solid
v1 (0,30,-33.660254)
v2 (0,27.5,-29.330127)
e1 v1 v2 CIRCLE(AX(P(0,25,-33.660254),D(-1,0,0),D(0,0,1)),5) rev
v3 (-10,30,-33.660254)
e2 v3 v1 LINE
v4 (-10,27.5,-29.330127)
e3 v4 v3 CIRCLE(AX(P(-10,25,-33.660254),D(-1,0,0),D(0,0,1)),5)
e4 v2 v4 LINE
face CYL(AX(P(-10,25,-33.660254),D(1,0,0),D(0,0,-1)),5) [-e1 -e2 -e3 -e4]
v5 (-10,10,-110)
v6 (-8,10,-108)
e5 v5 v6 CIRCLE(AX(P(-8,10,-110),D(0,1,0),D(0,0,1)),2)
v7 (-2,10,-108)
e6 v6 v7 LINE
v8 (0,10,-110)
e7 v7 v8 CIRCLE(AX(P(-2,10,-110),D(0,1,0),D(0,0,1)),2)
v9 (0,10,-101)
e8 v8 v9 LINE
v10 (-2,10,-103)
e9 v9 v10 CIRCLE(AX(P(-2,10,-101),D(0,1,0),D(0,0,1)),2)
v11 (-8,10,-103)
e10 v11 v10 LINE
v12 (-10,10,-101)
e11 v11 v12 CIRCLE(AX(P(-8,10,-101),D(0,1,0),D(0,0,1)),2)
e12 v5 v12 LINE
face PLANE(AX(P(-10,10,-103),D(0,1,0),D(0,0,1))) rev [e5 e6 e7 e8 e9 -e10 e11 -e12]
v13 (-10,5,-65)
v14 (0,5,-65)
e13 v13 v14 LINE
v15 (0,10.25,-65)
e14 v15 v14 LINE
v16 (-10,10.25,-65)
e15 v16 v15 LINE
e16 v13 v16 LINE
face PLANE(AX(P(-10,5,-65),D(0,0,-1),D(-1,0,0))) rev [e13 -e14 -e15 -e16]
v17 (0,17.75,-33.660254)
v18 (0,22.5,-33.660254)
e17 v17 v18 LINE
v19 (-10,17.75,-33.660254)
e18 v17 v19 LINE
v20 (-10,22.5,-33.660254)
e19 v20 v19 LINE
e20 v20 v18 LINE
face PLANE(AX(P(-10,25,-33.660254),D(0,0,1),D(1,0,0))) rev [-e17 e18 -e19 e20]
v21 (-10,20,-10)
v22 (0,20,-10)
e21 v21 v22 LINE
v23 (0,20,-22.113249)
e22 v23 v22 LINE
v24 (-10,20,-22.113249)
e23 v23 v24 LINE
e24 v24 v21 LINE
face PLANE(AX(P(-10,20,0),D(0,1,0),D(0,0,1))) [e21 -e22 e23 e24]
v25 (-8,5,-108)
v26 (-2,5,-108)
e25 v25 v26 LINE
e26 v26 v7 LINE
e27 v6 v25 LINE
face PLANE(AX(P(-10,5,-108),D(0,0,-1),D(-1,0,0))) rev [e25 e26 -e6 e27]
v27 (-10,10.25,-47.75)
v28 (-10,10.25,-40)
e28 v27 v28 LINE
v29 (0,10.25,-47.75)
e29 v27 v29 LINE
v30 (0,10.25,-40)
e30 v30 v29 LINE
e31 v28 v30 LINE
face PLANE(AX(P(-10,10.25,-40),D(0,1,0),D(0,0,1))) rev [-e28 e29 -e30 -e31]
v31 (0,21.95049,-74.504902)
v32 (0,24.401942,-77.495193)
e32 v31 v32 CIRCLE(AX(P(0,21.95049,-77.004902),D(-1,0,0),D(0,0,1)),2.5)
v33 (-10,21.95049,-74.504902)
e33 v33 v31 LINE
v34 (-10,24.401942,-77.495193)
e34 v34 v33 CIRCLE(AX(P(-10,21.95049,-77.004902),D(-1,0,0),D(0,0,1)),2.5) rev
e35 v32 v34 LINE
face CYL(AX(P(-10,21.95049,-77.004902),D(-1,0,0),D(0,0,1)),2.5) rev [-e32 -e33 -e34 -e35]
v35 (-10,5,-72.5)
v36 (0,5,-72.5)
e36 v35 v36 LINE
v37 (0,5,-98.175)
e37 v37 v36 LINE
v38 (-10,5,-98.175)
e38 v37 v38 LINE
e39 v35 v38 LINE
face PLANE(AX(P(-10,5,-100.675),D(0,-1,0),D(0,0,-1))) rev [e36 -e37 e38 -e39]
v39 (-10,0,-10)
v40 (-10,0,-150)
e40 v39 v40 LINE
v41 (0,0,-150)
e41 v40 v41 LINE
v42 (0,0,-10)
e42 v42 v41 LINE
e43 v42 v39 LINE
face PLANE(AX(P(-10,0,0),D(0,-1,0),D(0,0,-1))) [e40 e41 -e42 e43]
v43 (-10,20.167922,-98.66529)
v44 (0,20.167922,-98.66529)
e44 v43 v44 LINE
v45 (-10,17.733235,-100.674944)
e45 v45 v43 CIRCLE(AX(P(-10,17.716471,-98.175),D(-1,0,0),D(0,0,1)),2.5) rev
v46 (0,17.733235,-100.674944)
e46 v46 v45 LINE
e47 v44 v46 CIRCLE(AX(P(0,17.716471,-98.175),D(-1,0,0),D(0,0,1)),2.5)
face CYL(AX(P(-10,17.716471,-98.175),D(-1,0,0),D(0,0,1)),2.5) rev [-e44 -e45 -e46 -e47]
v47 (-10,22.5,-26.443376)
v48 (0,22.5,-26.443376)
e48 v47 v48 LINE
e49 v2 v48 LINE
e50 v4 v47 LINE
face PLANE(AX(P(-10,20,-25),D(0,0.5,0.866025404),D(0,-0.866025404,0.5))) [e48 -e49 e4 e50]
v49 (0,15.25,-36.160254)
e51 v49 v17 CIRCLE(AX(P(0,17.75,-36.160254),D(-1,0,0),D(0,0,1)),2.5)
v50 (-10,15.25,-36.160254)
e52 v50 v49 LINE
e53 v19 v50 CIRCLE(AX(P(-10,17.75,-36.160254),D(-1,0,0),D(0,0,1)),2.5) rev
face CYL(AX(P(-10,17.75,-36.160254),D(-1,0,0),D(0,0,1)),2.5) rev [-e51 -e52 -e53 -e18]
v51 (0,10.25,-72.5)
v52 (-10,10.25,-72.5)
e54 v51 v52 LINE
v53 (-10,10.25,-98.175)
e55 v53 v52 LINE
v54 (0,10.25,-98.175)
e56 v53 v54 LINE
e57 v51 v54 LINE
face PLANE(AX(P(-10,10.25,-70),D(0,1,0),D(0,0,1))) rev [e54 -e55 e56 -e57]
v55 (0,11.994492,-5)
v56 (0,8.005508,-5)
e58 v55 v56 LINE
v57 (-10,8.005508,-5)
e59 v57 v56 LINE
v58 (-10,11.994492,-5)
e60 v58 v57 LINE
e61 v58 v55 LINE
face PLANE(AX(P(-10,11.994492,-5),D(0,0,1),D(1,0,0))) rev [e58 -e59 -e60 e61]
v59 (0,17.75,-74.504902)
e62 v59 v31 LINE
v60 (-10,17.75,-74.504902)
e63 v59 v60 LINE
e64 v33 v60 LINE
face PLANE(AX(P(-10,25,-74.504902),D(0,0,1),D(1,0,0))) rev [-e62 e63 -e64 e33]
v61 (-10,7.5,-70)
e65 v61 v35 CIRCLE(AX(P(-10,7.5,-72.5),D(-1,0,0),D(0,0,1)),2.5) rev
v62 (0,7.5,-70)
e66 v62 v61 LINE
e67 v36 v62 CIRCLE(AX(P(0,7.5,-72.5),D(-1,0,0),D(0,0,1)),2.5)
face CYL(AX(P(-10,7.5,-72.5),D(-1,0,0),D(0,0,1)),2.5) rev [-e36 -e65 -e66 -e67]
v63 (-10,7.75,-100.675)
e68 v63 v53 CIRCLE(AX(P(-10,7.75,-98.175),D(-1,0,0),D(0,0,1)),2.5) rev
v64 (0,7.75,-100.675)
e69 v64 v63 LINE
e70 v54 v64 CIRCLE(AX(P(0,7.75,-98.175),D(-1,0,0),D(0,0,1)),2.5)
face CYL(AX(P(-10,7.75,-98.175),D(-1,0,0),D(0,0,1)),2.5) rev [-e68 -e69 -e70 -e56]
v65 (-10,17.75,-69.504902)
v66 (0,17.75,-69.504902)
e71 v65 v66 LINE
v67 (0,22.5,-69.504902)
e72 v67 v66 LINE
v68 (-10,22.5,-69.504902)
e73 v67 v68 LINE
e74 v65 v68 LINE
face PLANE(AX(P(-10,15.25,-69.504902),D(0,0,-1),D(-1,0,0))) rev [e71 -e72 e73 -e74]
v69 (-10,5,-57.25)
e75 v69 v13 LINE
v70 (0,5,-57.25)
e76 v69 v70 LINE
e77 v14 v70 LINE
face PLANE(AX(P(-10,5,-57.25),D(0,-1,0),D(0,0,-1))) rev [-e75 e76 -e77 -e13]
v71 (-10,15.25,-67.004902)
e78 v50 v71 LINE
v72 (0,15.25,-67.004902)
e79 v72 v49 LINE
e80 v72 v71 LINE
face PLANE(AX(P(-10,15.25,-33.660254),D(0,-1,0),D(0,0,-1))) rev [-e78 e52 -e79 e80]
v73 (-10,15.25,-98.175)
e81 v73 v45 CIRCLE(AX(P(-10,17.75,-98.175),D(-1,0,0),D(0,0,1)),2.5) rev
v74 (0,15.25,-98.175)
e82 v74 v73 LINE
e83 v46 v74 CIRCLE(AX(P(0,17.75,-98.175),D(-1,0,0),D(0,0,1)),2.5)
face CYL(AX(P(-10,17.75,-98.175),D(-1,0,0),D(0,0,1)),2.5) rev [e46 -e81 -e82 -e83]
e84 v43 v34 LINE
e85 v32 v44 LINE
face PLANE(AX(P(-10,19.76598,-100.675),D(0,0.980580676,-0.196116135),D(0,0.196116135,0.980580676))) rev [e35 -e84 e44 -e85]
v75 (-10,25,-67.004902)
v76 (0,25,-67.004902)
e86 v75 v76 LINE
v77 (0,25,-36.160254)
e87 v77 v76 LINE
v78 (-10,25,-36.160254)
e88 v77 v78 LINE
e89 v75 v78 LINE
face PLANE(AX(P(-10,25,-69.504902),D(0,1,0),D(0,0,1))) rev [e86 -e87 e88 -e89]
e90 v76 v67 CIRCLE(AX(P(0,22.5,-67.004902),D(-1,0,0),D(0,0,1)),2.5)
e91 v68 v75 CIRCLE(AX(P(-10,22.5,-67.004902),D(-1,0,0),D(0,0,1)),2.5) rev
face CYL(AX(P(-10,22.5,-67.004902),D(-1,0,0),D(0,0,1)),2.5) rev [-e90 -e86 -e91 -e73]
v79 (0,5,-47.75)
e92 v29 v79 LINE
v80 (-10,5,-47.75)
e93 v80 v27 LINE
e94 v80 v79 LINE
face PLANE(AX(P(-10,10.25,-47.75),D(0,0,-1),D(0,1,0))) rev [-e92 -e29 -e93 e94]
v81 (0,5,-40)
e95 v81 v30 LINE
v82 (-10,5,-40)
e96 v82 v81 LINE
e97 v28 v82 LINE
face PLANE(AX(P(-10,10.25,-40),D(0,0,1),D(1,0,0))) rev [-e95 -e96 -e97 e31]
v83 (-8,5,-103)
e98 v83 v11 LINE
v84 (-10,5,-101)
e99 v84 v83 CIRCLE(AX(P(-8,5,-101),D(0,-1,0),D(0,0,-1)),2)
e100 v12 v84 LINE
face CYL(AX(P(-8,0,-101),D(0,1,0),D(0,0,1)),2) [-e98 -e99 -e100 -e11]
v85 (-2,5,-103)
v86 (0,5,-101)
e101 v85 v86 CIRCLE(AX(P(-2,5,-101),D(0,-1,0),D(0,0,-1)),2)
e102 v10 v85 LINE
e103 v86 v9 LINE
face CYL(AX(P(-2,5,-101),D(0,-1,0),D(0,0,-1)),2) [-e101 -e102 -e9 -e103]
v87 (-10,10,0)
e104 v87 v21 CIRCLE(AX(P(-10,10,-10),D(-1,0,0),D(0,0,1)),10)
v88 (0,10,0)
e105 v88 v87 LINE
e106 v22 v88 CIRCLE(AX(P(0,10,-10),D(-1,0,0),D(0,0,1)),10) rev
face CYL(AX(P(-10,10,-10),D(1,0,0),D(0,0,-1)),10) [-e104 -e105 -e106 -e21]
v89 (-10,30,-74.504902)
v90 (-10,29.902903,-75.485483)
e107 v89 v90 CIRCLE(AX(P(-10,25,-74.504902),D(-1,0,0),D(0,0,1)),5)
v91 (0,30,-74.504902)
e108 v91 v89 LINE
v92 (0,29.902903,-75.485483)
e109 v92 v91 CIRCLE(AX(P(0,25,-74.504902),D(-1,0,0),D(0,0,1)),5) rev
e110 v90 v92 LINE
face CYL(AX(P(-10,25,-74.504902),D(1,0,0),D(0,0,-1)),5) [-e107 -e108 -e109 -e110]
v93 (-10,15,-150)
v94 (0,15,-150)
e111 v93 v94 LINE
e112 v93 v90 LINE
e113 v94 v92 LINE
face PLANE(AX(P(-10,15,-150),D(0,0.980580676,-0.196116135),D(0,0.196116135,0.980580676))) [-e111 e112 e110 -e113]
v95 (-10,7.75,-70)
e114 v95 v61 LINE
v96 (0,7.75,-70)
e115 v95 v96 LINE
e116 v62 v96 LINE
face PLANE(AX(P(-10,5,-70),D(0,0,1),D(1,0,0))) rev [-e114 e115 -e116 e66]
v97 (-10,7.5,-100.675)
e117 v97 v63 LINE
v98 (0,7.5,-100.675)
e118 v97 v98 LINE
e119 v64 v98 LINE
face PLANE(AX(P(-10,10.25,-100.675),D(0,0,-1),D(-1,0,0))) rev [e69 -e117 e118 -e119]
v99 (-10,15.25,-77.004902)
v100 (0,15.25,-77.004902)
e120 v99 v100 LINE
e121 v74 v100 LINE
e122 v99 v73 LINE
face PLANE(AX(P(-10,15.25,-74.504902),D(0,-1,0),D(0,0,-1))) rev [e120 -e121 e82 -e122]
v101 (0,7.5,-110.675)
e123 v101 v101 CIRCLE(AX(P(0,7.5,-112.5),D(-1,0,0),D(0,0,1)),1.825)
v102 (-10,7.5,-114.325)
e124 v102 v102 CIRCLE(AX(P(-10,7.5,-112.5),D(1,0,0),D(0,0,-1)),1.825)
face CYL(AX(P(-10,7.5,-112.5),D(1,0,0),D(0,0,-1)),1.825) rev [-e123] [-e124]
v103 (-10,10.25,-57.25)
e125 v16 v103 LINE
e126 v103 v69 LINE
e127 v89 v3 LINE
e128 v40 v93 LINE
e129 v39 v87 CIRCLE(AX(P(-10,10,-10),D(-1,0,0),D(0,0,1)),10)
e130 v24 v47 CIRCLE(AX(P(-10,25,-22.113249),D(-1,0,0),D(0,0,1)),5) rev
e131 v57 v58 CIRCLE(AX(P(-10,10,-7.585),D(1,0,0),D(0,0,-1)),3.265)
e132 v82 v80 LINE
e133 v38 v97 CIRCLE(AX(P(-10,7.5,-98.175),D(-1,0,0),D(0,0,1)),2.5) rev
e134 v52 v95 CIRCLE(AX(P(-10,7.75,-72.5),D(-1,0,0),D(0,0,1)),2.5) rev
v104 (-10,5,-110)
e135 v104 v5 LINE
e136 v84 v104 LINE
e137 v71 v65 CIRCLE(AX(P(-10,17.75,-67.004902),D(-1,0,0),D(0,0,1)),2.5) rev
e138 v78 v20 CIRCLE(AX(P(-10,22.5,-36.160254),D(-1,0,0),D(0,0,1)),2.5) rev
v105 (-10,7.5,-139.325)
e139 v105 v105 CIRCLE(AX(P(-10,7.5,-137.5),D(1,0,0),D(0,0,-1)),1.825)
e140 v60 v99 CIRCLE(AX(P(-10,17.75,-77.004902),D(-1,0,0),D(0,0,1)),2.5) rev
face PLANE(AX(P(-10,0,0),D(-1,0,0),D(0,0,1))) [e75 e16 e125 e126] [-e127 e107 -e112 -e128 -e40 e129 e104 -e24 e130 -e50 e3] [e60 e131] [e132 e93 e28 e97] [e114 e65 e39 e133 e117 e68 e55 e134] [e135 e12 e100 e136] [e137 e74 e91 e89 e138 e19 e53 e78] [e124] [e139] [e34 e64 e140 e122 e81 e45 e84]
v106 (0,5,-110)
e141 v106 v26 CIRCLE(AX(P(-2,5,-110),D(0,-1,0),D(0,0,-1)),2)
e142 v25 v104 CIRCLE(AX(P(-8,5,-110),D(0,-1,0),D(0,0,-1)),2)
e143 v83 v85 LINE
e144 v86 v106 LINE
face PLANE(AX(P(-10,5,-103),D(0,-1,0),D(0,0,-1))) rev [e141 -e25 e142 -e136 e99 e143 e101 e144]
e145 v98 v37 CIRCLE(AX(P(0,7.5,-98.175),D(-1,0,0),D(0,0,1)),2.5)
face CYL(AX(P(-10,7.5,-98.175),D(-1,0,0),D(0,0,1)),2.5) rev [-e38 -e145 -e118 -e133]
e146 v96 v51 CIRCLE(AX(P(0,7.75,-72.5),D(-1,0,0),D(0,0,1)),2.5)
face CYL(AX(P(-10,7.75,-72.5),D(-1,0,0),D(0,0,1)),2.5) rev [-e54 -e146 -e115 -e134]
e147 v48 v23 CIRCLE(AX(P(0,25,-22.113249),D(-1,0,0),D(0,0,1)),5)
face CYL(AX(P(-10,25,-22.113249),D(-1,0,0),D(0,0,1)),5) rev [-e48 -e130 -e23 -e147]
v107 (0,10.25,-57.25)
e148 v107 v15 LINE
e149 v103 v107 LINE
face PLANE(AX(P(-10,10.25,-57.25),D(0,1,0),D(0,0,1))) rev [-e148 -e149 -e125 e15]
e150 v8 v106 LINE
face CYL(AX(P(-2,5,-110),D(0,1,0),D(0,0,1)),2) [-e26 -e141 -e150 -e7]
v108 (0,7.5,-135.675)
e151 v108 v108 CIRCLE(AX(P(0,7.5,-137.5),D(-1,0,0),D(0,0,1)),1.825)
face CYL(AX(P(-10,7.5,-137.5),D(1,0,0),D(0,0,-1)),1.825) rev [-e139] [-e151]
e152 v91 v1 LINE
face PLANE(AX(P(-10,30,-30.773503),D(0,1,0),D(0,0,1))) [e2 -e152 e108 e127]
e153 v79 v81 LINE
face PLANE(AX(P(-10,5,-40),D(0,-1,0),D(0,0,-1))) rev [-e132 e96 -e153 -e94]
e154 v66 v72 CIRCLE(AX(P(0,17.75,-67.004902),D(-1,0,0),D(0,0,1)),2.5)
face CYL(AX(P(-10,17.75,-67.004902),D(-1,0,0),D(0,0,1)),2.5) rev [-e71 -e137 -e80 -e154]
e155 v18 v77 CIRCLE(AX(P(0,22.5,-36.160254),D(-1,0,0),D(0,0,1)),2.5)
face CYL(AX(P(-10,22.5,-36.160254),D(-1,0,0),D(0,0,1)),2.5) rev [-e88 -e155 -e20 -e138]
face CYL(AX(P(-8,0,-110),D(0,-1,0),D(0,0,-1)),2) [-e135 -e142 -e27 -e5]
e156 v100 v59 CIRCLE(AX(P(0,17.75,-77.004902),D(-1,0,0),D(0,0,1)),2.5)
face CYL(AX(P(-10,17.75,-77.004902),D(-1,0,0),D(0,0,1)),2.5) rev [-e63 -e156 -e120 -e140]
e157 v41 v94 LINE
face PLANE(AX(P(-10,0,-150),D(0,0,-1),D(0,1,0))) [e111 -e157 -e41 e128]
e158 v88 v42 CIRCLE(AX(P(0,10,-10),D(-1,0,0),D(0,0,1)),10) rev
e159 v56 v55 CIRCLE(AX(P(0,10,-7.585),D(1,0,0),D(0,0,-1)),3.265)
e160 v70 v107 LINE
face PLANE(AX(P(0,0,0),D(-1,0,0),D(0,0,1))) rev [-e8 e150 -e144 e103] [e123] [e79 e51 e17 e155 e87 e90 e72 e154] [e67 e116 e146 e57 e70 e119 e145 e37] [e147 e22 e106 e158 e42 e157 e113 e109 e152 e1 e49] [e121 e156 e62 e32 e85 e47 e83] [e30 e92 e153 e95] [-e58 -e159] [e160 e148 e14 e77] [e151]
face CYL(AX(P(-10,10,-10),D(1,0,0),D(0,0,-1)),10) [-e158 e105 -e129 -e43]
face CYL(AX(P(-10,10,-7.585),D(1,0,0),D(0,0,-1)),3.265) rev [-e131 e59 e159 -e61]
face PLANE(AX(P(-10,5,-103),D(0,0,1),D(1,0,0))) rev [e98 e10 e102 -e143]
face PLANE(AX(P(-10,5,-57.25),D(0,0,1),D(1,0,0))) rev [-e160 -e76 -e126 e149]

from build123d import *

# Parameters (mm, degrees)
BOSS_EXTRUDE1_DEPTH     = 10
CUT_EXTRUDE2_DEPTH      = 154.297097168
FILLET1_R               = 10
FILLET2_R               = 5
CUT_EXTRUDE3_DEPTH      = 154.297097168
CUT_EXTRUDE3_DEPTH_BACK = 154.297097168
SKETCH3_W               = 7.75
SKETCH3_H               = 5.25
CUT_EXTRUDE6_DEPTH      = 154.297097168
CUT_EXTRUDE6_DEPTH_BACK = 154.297097168
SKETCH6_R               = 1.825
FILLET3_R               = 5
CUT_EXTRUDE7_DEPTH      = 154.297097168
CUT_EXTRUDE7_DEPTH_BACK = 154.297097168
SKETCH7_W               = 35.844648394
SKETCH7_H               = 9.75
SKETCH7_W_2             = 30.675
SKETCH7_H_2             = 5.25
FILLET4_R               = 2.5
SKETCH8_W               = 5
SKETCH8_H               = 5
CUT_EXTRUDE8_DEPTH      = 10
FILLET5_R               = 2
FILLET6_R               = 2
FILLET7_R               = 2
FILLET8_R               = 2


# Some blends are built 0.0001 mm under size
with BuildPart() as part:
    # Sketch1 → Boss-Extrude1 (new body)
    with BuildSketch(Plane(origin=(0, 0, 0), x_dir=(0, 0, -1), z_dir=(1, 0, 0))):
        Polygon((0, 0), (150, 0), (150, 15), (75, 30), (30.773502692, 30), (25, 20), (0, 20), align=None)
    extrude(amount=-BOSS_EXTRUDE1_DEPTH)

    # Sketch2 → Cut-Extrude2 (cut, through all)
    with BuildSketch(Plane(origin=(0, 0, 0), x_dir=(0, 0, -1), z_dir=(1, 0, 0))):
        with BuildLine():
            Line((5, 11.994492417), (5, 8.005507583))
            ThreePointArc((5, 8.005507583), (10.85, 10), (5, 11.994492417))
        make_face()
    extrude(amount=-CUT_EXTRUDE2_DEPTH, mode=Mode.SUBTRACT)

    # Fillet1
    fillet1_edges = [part.edges().sort_by_distance(p)[0] for p in [
        (-5, 0, 0),
        (-5, 20, 0),
    ]]
    fillet(fillet1_edges, radius=FILLET1_R - 0.0001)  # a hair under: the kernel refuses the full size

    # Fillet2
    fillet2_edges = [part.edges().sort_by_distance(p)[0] for p in [
        (-5, 30, -30.773502692),
        (-5, 30, -75),
    ]]
    fillet(fillet2_edges, radius=FILLET2_R)

    # Sketch3 → Cut-Extrude3 (cut, two sides: drawn at the far end of the back side and taken through both)
    with BuildSketch(Plane(origin=(0, 0, 0), x_dir=(0, 0, -1), z_dir=(1, 0, 0)).offset(-CUT_EXTRUDE3_DEPTH_BACK)):
        with Locations((61.125, 7.625)):
            Rectangle(SKETCH3_W, SKETCH3_H)
        with Locations((43.875, 7.625)):
            Rectangle(SKETCH3_W, SKETCH3_H)
    extrude(amount=CUT_EXTRUDE3_DEPTH + CUT_EXTRUDE3_DEPTH_BACK, mode=Mode.SUBTRACT)

    # Sketch6 → Cut-Extrude6 (cut, two sides: drawn at the far end of the back side and taken through both)
    with BuildSketch(Plane(origin=(0, 0, 0), x_dir=(0, 0, -1), z_dir=(1, 0, 0)).offset(-CUT_EXTRUDE6_DEPTH_BACK)):
        with Locations((112.5, 7.5)):
            Circle(SKETCH6_R)
        with Locations((137.5, 7.5)):
            Circle(SKETCH6_R)
    extrude(amount=CUT_EXTRUDE6_DEPTH + CUT_EXTRUDE6_DEPTH_BACK, mode=Mode.SUBTRACT)

    # Fillet3
    fillet3_edges = [part.edges().sort_by_distance(p)[0] for p in [
        (-5, 20, -25),
    ]]
    fillet(fillet3_edges, radius=FILLET3_R)

    # Sketch7 → Cut-Extrude7 (cut, two sides: drawn at the far end of the back side and taken through both)
    with BuildSketch(Plane(origin=(0, 0, 0), x_dir=(0, 0, -1), z_dir=(1, 0, 0)).offset(-CUT_EXTRUDE7_DEPTH_BACK)):
        with Locations((51.582578235, 20.125)):
            Rectangle(SKETCH7_W, SKETCH7_H)
        with Locations((85.3375, 7.625)):
            Rectangle(SKETCH7_W_2, SKETCH7_H_2)
        Polygon((100.675, 15.25), (100.675, 19.765980486), (74.504902432, 25), (74.504902432, 15.25), align=None)
    extrude(amount=CUT_EXTRUDE7_DEPTH + CUT_EXTRUDE7_DEPTH_BACK, mode=Mode.SUBTRACT)

    # Fillet4
    # the kernel refuses this fillet: 2.5 mm, written as the material it adds along each edge
    with BuildSketch(Plane(origin=(0, 15.25, -69.504902432), x_dir=(0, 0, 1), z_dir=(-1, 0, 0)), Plane(origin=(-10, 25, -33.660254038), x_dir=(0, -1, 0), z_dir=(1, 0, 0)), Plane(origin=(0, 25, -69.504902432), x_dir=(0, -1, 0), z_dir=(-1, 0, 0)), Plane(origin=(0, 15.25, -74.504902432), x_dir=(0, 1, 0), z_dir=(-1, 0, 0)), Plane(origin=(0, 15.25, -100.675), x_dir=(0, 0, 1), z_dir=(-1, 0, 0)), Plane(origin=(0, 5, -100.675), x_dir=(0, 0, 1), z_dir=(-1, 0, 0))) as fillet4_piece_1:
        with BuildLine():
            CenterArc((FILLET4_R, FILLET4_R), FILLET4_R, 180, 90)
            Line((0, FILLET4_R), (0, 0))
            Line((0, 0), (FILLET4_R, 0))
        make_face()
    extrude(amount=10)
    with BuildSketch(Plane(origin=(-10, 15.25, -33.660254038), x_dir=(0, 1, 0), z_dir=(1, 0, 0)), Plane(origin=(-10, 5, -70), x_dir=(0, 1, 0), z_dir=(1, 0, 0)), Plane(origin=(-10, 10.25, -70), x_dir=(0, 0, -1), z_dir=(1, 0, 0)), Plane(origin=(0, 10.25, -100.675), x_dir=(0, 0, 1), z_dir=(-1, 0, 0))) as fillet4_piece_2:
        with BuildLine():
            CenterArc((FILLET4_R, -FILLET4_R), FILLET4_R, 90, 90)
            Line((0, -FILLET4_R), (0, 0))
            Line((0, 0), (FILLET4_R, 0))
        make_face()
    extrude(amount=10)
    with BuildSketch(Plane(origin=(-10, 25, -74.504902432), x_dir=(0, -0.1961161351381845, -0.9805806756909201), z_dir=(1, 0, 0))) as fillet4_piece_3:
        with BuildLine():
            CenterArc((FILLET4_R * 1.21980390272, -FILLET4_R), FILLET4_R, 90, 101.309932474)
            Line((FILLET4_R * 0.239223227028, -FILLET4_R * 1.19611613514), (0, 0))
            Line((0, 0), (FILLET4_R * 1.21980390272, 0))
        make_face()
    extrude(amount=10)
    with BuildSketch(Plane(origin=(-10, 19.765980486, -100.675), x_dir=(0, 0.19611613513818169, 0.9805806756909206), z_dir=(1, 0, 0))) as fillet4_piece_4:
        with BuildLine():
            CenterArc((FILLET4_R * 0.819803902719, FILLET4_R), FILLET4_R, 191.309932474, 78.690067526)
            Line((-FILLET4_R * 0.160776772972, FILLET4_R * 0.803883864862), (0, 0))
            Line((0, 0), (FILLET4_R * 0.819803902719, 0))
        make_face()
    extrude(amount=10)

    # Sketch8 → Cut-Extrude8 (cut)
    with BuildSketch(Plane(origin=(0, 0, 0), x_dir=(0, 0, -1), z_dir=(1, 0, 0))):
        with Locations((105.5, 7.5)):
            Rectangle(SKETCH8_W, SKETCH8_H)
    extrude(amount=-CUT_EXTRUDE8_DEPTH, mode=Mode.SUBTRACT)

    # Fillet5
    fillet5_edges = [part.edges().sort_by_distance(p)[0] for p in [
        (0, 7.5, -103),
    ]]
    fillet(fillet5_edges, radius=FILLET5_R)

    # Fillet6
    fillet6_edges = [part.edges().sort_by_distance(p)[0] for p in [
        (-10, 7.5, -108),
    ]]
    fillet(fillet6_edges, radius=FILLET6_R)

    # Fillet7
    fillet7_edges = [part.edges().sort_by_distance(p)[0] for p in [
        (-10, 7.5, -103),
    ]]
    fillet(fillet7_edges, radius=FILLET7_R)

    # Fillet8
    fillet8_edges = [part.edges().sort_by_distance(p)[0] for p in [
        (0, 7.5, -108),
    ]]
    fillet(fillet8_edges, radius=FILLET8_R)


solid = part.part
